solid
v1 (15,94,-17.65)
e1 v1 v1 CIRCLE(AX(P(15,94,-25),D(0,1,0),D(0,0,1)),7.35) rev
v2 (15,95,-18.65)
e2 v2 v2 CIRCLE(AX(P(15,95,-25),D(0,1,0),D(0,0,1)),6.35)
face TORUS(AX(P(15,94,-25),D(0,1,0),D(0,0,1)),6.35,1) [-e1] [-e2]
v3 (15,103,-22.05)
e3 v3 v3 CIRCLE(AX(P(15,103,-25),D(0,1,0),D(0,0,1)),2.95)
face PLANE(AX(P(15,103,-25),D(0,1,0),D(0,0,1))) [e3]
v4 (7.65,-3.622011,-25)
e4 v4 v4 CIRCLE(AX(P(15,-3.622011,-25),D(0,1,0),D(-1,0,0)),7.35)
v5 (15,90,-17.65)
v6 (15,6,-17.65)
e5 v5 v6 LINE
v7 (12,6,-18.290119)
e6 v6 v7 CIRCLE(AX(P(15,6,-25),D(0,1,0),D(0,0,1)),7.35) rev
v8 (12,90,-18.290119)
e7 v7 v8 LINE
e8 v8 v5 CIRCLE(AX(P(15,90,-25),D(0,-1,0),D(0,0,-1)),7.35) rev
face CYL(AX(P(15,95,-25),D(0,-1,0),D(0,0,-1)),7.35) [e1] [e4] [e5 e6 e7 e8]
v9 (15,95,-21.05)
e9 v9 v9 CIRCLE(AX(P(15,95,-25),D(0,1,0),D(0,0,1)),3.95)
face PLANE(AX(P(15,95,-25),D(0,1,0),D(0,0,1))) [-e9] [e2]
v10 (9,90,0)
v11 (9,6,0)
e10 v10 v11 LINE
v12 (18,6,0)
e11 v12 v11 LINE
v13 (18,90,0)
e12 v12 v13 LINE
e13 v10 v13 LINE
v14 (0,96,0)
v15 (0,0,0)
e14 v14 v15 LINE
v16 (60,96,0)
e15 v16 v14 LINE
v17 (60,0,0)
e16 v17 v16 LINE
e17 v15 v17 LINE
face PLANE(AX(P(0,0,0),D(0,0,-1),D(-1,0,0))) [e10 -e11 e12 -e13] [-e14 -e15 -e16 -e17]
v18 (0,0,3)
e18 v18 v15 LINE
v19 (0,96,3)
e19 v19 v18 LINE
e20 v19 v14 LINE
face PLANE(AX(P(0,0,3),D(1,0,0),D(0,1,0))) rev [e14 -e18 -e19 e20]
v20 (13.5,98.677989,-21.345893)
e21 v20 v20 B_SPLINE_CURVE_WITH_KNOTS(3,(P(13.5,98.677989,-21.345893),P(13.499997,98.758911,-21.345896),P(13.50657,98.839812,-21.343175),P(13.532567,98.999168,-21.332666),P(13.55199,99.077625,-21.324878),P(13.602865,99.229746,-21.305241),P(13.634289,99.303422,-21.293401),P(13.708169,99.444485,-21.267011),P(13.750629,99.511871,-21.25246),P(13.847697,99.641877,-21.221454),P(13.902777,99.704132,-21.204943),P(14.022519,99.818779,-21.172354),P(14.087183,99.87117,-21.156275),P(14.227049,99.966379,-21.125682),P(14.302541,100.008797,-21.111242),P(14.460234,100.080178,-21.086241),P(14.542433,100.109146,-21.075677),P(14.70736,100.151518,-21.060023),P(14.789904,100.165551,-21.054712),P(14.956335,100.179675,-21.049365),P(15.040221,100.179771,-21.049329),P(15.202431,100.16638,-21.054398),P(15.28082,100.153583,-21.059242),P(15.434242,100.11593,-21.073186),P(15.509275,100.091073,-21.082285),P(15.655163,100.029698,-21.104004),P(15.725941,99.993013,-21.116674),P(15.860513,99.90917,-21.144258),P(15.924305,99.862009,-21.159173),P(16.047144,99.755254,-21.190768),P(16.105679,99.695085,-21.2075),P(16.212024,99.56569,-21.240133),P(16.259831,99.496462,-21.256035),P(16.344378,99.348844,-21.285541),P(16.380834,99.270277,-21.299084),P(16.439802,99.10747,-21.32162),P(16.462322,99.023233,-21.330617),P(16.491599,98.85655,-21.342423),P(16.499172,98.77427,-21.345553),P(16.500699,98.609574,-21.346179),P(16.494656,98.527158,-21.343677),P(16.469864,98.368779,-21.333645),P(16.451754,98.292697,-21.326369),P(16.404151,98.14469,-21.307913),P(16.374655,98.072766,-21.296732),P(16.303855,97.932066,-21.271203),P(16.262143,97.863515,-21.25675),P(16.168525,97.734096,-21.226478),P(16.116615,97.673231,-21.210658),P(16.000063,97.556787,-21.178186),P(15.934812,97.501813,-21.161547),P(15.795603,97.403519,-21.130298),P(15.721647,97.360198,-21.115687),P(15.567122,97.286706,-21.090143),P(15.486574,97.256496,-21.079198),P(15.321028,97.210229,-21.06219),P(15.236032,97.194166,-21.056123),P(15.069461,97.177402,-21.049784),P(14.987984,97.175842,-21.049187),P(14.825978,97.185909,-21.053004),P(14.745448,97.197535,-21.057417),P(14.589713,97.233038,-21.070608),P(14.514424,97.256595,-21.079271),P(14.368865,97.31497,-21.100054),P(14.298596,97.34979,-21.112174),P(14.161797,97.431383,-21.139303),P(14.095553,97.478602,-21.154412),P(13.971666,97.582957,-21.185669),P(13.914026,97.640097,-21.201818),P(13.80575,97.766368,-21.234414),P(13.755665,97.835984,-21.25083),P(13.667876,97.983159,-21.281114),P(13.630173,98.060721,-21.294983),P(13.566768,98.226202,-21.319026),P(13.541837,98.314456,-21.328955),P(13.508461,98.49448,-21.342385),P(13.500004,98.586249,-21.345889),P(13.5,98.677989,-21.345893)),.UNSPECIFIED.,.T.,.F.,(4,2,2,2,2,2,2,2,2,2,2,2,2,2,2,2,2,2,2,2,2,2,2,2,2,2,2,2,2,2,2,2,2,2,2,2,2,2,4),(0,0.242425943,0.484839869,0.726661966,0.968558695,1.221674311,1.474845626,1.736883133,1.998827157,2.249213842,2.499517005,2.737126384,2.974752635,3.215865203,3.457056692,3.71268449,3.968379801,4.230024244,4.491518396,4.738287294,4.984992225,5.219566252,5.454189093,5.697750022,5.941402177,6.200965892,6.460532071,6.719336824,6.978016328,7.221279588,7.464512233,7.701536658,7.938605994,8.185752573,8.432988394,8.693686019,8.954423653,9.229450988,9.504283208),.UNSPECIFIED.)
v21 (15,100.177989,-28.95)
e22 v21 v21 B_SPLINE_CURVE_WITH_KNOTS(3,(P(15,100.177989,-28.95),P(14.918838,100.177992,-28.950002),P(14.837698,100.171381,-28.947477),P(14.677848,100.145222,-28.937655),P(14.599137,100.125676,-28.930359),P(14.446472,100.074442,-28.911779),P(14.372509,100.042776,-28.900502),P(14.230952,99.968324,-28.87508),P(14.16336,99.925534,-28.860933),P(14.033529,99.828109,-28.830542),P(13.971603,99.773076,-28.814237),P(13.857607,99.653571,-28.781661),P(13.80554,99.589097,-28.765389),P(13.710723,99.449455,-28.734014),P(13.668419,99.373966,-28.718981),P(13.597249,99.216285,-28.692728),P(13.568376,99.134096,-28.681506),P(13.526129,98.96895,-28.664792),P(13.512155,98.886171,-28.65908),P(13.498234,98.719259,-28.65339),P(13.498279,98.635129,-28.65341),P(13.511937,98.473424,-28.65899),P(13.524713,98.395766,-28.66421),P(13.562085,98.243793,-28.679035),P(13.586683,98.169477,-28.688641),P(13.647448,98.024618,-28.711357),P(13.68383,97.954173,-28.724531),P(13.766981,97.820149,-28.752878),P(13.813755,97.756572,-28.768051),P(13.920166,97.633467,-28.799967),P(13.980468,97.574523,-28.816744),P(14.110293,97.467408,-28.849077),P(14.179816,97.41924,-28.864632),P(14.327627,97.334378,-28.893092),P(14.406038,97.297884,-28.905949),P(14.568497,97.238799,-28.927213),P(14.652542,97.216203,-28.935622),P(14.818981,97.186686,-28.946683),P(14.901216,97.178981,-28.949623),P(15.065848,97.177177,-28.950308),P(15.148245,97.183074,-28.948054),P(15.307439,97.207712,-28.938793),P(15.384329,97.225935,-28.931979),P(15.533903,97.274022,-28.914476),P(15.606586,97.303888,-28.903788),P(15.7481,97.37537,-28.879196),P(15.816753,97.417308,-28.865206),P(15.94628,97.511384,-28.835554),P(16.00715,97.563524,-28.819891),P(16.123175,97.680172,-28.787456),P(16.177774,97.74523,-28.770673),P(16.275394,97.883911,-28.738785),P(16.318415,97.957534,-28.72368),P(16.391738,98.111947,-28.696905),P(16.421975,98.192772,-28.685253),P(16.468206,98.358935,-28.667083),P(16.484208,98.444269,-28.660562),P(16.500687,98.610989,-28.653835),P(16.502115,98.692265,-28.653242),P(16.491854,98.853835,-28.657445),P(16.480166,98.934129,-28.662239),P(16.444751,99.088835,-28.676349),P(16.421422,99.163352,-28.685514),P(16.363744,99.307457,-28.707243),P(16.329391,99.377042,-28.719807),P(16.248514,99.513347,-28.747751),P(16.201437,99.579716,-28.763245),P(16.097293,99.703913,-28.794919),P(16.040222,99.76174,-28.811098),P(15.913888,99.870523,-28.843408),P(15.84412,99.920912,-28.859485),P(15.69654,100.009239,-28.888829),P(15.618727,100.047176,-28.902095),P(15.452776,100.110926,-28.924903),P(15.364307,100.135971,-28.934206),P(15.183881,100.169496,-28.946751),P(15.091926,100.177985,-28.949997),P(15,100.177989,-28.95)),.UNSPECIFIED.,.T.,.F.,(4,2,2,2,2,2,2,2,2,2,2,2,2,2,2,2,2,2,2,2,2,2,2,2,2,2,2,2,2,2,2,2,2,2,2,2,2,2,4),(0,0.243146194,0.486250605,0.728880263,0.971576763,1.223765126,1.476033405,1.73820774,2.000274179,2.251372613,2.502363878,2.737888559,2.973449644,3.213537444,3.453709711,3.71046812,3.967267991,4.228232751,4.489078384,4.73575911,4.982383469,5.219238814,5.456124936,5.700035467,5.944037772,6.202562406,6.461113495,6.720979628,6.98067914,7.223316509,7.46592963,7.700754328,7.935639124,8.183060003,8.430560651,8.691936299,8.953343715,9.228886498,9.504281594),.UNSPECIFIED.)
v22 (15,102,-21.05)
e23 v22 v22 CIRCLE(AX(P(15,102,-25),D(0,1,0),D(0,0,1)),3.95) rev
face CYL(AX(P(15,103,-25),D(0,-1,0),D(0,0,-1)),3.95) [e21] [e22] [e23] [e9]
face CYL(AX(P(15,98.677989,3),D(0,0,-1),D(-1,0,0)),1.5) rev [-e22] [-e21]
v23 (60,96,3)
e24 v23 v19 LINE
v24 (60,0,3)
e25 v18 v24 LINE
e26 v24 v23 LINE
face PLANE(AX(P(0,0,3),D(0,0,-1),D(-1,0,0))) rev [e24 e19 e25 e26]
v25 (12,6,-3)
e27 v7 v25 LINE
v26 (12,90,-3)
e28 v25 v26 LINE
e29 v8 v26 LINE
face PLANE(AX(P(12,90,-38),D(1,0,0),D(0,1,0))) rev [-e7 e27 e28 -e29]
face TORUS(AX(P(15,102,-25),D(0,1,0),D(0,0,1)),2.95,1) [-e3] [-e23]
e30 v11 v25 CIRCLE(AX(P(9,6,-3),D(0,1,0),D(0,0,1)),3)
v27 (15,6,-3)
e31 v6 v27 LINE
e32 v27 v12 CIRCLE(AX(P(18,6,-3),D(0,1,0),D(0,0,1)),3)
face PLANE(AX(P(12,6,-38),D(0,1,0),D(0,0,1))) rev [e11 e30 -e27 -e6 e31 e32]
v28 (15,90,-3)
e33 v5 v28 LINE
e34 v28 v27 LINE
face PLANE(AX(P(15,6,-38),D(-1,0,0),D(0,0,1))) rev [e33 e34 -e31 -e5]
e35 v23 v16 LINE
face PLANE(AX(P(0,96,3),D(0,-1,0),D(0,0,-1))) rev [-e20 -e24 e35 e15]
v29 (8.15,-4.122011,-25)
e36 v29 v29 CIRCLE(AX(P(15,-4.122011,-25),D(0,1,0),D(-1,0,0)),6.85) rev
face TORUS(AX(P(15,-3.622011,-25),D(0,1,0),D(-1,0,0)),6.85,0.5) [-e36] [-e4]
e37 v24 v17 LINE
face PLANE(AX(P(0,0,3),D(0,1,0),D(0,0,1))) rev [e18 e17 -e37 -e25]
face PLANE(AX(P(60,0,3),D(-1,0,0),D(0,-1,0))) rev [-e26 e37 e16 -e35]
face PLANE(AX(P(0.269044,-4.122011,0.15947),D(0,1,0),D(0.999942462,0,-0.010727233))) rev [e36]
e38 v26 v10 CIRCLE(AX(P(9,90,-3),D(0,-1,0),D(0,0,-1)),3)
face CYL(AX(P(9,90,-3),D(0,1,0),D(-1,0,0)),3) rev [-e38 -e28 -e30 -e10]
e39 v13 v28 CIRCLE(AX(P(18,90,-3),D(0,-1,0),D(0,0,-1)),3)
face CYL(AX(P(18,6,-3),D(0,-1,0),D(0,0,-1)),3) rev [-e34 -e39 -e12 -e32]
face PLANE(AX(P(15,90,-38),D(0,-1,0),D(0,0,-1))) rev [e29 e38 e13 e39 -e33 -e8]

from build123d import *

# Parameters (mm, degrees)
SKETCH_1_W               = 60
SKETCH_1_H               = 96
EXTRUDE_1_DEPTH          = 3
SKETCH_2_W               = 3
SKETCH_2_H               = 84
EXTRUDE_2_DEPTH          = 38
EXTRUDE_3_DEPTH          = 5
EXTRUDE_3_DEPTH_BACK     = 94.122011
SKETCH_4_R               = 7.35
SKETCH_5_R               = 3.95
EXTRUDE_4_DEPTH          = 8
FILLET_2_R               = 1
CUT_EXTRUDE_1_DEPTH      = 124.40908597
CUT_EXTRUDE_1_DEPTH_BACK = 124.40908597
SKETCH_9_R               = 1.5
FILLET_3_R               = 0.5
CUT_EXTRUDE_START        = 6
CUT_EXTRUDE_3_DEPTH      = 84
FILLET_6_R               = 3


# Read off the part's stored shape, not the designer's step: 切除-拉伸3
with BuildPart() as part:
    # 草图1 → 凸台-拉伸1 (new body)
    with BuildSketch(Plane.XY):
        with Locations((30, 48)):
            Rectangle(SKETCH_1_W, SKETCH_1_H)
    extrude(amount=EXTRUDE_1_DEPTH)

    # 草图2 → 凸台-拉伸2 (add)
    with BuildSketch(Plane(origin=(0, 0, 0), x_dir=(-1, 0, 0), z_dir=(0, 0, -1))):
        with Locations((-13.5, 48)):
            Rectangle(SKETCH_2_W, SKETCH_2_H)
    extrude(amount=EXTRUDE_2_DEPTH)

    # 草图4 → 凸台-拉伸3 (add, two sides: drawn at the far end of the back side and taken through both)
    with BuildSketch(Plane(origin=(0, 90, 0), x_dir=(1, 0, 0), z_dir=(0, 1, 0)).offset(-EXTRUDE_3_DEPTH_BACK)):
        with Locations(Location((15, 25, 0), (0, 0, 180))):
            Circle(SKETCH_4_R)
    extrude(amount=EXTRUDE_3_DEPTH + EXTRUDE_3_DEPTH_BACK)

    # 草图5 → 凸台-拉伸4 (add)
    with BuildSketch(Plane(origin=(0, 95, 0), x_dir=(1, 0, 0), z_dir=(0, 1, 0))):
        with Locations(Location((15, 25, 0), (0, 0, 270))):
            Circle(SKETCH_5_R)
    extrude(amount=EXTRUDE_4_DEPTH)

    # 圆角2
    fillet_2_edges = [part.edges().sort_by_distance(p)[0] for p in [
        (22.35, 95, -25),
        (15, 103, -28.95),
    ]]
    fillet(fillet_2_edges, radius=FILLET_2_R)

    # 草图9 → 切除-拉伸1 (cut, two sides: drawn at the far end of the back side and taken through both)
    with BuildSketch(Plane(origin=(0, 0, -28.95), x_dir=(-1, 0, 0), z_dir=(0, 0, -1)).offset(-CUT_EXTRUDE_1_DEPTH_BACK)):
        with Locations(Location((-15, 98.677988735, 0), (0, 0, 90.000000013))):
            Circle(SKETCH_9_R)
    extrude(amount=CUT_EXTRUDE_1_DEPTH + CUT_EXTRUDE_1_DEPTH_BACK, mode=Mode.SUBTRACT)

    # 圆角3
    fillet_3_edges = [part.edges().sort_by_distance(p)[0] for p in [
        (22.35, -4.122011, -25),
    ]]
    fillet(fillet_3_edges, radius=FILLET_3_R)

    # 切除-拉伸3 outline → 切除-拉伸3 (cut)
    with BuildSketch(Plane(origin=(0, 0, 0), x_dir=(1, 0, 0), z_dir=(0, 1, 0)).offset(CUT_EXTRUDE_START)):
        with BuildLine():
            Line((12, 38), (12, 31.709880774))
            ThreePointArc((12, 31.709880774), (13.466233996, 32.188189052), (15, 32.35))
            Line((15, 32.35), (15, 38))
            Line((15, 38), (12, 38))
        make_face()
    extrude(amount=CUT_EXTRUDE_3_DEPTH, mode=Mode.SUBTRACT)

    # 圆角6
    fillet_6_edges = [part.edges().sort_by_distance(p)[0] for p in [
        (12, 48, 0),
        (15, 48, 0),
    ]]
    fillet(fillet_6_edges, radius=FILLET_6_R)


solid = part.part
